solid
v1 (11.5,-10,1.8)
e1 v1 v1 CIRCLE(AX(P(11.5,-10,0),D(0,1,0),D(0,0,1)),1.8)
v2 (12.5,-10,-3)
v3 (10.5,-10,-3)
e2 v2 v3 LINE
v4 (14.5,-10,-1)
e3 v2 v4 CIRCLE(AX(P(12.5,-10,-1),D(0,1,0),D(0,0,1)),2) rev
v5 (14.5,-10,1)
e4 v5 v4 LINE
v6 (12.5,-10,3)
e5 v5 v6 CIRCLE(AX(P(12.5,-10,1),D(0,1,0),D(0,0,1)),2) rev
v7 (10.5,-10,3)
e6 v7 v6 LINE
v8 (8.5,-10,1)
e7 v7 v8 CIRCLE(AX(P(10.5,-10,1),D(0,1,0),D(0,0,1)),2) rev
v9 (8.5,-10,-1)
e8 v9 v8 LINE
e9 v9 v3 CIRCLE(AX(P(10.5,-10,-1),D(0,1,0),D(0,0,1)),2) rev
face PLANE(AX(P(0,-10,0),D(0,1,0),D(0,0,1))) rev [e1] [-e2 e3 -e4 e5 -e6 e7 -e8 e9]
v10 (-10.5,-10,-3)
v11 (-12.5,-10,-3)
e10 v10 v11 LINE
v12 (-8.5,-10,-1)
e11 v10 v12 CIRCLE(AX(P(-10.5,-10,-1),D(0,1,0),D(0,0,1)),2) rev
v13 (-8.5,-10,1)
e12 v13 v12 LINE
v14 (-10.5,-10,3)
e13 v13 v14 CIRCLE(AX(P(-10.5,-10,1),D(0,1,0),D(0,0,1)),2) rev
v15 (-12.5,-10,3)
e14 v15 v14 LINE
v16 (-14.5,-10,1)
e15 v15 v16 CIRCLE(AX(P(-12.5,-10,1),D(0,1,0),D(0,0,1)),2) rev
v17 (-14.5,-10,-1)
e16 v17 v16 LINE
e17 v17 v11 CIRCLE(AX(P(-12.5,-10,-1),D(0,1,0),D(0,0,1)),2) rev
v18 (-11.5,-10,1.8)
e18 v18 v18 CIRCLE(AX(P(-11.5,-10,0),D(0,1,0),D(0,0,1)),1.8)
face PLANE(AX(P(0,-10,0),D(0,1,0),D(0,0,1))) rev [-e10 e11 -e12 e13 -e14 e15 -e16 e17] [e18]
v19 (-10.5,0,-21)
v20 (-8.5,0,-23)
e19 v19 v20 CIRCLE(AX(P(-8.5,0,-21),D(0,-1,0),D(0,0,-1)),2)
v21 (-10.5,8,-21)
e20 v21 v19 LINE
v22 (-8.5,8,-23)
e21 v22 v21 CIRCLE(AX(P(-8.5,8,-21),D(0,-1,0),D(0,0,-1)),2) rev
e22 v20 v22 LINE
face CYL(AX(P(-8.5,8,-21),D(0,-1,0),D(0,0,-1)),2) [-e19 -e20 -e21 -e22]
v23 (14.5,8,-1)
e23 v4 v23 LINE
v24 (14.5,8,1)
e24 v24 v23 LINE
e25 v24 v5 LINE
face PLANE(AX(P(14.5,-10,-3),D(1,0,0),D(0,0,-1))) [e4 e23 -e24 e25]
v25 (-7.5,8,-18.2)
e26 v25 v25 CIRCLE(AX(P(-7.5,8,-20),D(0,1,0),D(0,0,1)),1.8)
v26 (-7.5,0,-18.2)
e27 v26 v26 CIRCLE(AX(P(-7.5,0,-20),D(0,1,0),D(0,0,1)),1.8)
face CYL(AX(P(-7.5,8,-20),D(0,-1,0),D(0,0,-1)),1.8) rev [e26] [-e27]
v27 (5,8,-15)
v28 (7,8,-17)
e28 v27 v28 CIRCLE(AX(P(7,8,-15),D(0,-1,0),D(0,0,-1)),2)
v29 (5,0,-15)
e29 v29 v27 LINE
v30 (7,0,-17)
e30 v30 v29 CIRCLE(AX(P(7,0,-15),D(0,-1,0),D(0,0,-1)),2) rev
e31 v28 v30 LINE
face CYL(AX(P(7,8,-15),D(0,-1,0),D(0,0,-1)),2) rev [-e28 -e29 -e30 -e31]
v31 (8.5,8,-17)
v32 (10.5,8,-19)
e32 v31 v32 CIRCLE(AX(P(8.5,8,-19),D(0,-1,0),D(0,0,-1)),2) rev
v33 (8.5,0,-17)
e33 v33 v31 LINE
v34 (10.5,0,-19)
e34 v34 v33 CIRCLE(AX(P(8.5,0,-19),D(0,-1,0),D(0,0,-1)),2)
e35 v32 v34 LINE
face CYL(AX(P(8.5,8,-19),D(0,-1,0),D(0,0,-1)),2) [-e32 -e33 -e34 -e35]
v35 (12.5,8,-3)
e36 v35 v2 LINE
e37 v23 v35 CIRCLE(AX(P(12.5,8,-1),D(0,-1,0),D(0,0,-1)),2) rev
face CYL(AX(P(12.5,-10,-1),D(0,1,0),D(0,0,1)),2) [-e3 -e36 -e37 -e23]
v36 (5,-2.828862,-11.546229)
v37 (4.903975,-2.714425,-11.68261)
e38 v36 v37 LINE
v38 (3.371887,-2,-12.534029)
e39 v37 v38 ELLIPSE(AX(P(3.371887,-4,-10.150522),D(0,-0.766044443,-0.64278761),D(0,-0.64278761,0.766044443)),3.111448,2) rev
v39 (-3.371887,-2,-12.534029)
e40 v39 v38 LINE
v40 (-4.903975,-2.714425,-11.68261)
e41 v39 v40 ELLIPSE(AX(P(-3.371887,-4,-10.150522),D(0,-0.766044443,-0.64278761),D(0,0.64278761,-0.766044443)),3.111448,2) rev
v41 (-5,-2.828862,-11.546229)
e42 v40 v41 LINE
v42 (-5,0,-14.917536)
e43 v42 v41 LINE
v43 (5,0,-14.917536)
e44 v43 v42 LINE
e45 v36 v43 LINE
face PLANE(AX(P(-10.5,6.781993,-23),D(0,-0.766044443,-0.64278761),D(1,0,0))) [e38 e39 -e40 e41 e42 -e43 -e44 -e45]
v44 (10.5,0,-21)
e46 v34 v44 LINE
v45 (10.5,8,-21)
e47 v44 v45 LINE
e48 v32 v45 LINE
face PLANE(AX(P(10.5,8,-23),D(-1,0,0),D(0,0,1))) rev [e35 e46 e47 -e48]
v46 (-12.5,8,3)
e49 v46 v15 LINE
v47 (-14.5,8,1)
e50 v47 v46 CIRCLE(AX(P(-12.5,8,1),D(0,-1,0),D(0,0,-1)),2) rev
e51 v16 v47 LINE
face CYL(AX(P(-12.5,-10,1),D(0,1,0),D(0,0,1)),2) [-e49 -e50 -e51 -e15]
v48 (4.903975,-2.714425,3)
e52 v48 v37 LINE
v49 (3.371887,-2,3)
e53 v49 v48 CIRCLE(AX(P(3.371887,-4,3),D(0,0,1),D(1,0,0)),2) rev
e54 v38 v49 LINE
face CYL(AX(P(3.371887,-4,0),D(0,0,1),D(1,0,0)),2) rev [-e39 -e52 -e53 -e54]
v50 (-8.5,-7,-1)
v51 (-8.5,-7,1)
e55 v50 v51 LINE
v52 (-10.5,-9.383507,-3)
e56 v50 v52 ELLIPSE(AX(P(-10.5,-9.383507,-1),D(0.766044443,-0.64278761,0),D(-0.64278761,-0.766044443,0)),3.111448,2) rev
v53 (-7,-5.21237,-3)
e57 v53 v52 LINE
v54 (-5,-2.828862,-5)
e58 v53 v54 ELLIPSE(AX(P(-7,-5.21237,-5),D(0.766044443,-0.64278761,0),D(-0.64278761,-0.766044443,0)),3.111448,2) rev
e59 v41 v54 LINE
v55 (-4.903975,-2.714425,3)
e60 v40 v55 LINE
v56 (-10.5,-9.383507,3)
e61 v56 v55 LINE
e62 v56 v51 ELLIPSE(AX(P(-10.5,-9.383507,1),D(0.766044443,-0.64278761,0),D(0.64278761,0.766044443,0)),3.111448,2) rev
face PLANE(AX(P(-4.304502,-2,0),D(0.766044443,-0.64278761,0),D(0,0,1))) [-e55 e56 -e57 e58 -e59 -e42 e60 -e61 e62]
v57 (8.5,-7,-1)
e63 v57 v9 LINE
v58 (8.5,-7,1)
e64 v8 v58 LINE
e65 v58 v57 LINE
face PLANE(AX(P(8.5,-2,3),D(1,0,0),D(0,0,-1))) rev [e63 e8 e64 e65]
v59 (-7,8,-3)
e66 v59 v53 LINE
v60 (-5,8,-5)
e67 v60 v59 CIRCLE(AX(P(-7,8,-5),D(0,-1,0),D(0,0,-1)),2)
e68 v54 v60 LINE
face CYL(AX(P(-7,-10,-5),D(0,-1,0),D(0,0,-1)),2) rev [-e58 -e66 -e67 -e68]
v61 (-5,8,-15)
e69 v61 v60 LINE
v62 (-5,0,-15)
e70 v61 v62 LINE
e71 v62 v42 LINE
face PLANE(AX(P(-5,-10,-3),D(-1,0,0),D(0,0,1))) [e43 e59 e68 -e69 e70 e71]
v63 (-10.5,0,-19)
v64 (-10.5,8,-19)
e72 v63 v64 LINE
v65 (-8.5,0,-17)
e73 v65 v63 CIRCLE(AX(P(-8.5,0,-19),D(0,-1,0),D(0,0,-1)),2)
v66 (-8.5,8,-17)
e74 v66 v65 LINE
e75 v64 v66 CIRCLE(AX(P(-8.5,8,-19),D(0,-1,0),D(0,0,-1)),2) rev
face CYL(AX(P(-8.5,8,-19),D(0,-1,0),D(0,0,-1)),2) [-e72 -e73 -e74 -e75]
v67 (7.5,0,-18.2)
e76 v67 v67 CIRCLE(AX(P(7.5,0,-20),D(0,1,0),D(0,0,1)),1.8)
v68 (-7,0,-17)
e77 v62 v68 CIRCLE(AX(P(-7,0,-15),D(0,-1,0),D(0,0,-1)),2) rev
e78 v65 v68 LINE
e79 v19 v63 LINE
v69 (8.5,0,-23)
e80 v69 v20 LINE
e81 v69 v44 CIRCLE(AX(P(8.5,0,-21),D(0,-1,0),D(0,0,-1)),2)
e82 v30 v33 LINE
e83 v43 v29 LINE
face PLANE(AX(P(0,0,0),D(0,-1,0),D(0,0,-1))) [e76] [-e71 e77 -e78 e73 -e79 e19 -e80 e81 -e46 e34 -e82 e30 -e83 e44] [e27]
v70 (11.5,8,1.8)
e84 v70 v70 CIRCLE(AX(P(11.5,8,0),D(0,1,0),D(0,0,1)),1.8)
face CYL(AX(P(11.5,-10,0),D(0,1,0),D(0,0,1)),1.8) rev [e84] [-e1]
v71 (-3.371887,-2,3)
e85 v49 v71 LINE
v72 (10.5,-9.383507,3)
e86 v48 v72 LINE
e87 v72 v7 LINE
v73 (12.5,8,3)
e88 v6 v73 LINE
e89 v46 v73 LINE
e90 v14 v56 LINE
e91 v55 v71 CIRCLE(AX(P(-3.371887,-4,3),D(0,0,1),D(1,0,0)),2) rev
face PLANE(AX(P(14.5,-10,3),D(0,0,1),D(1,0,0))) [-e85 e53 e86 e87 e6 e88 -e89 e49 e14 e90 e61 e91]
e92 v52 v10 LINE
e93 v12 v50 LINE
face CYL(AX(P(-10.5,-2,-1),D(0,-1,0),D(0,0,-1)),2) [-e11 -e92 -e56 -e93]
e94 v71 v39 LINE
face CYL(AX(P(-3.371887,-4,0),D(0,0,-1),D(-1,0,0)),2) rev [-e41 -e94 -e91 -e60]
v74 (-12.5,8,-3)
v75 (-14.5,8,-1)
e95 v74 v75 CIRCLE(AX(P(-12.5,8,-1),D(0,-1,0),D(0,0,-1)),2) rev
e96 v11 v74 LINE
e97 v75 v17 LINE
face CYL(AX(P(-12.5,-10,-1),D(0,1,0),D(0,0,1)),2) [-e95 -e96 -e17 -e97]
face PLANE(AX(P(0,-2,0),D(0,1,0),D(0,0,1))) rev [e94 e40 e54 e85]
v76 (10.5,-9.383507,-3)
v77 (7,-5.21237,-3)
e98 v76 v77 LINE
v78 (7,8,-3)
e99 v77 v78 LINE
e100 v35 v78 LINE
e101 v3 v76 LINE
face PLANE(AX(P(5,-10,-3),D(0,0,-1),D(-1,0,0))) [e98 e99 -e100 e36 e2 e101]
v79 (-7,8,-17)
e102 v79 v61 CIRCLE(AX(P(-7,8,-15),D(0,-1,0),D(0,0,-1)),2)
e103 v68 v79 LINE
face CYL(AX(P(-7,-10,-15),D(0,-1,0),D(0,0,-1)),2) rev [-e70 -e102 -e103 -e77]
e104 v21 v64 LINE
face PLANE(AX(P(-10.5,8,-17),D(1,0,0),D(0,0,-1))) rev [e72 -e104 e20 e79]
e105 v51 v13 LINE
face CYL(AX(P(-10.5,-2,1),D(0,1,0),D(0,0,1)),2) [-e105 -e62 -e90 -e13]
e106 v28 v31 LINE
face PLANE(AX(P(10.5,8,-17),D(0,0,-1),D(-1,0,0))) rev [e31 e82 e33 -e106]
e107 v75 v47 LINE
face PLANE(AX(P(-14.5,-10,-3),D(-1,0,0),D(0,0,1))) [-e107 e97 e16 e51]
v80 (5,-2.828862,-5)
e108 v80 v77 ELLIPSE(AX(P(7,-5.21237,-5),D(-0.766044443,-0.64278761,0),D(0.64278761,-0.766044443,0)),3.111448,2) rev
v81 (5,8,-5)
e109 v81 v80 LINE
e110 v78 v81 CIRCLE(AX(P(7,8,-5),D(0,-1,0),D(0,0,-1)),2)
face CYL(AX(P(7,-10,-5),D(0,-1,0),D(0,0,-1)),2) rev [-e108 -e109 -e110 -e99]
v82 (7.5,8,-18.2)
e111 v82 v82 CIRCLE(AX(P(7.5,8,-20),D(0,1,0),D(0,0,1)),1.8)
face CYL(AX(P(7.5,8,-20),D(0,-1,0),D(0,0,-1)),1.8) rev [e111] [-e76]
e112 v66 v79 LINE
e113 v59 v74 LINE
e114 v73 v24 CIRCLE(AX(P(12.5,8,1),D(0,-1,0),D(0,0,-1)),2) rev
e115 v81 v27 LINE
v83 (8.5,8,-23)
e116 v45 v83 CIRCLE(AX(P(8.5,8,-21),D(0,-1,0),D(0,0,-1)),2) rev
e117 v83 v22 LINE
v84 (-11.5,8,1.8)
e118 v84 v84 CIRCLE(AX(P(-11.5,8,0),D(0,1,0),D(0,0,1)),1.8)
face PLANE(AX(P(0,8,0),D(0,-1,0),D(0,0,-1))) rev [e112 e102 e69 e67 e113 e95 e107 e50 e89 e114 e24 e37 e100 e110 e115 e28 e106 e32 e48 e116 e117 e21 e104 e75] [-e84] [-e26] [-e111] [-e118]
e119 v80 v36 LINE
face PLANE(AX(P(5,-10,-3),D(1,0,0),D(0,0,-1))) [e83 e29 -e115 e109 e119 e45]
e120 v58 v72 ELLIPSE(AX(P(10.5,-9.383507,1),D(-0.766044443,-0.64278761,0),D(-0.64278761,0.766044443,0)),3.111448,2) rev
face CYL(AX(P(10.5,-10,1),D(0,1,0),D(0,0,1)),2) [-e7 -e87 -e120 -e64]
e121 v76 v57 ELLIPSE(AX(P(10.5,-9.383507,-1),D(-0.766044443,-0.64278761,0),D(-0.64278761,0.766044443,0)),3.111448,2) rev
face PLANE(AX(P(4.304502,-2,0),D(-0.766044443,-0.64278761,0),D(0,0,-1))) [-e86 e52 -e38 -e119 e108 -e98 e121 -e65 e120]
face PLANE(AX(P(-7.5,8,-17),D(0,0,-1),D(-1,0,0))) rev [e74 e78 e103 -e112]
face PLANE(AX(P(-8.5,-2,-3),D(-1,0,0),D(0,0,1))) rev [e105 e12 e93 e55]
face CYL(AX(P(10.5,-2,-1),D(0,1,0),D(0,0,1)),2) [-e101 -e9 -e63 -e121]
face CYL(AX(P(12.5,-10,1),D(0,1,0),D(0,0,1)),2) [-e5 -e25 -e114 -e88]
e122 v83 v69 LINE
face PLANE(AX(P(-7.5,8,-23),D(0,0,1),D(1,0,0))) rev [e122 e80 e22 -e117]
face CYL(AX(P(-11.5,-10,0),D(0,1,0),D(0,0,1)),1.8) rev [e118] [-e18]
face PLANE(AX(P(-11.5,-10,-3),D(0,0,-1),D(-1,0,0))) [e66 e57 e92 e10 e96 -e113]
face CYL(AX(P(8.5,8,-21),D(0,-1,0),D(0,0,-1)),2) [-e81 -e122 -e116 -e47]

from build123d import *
from OCP.BRepFilletAPI import BRepFilletAPI_MakeChamfer

# Parameters (mm, degrees)
SKETCH2_R           = 1.8
BOSS_EXTRUDE1_DEPTH = 10
CHAMFER1_SIZE       = 20
CHAMFER1_SIZE_2     = 16.781992624
BOSS_EXTRUDE3_START = 8
SKETCH4_R           = 1.8
BOSS_EXTRUDE3_DEPTH = 8
CUT_EXTRUDE1_DEPTH  = 8
CHAMFER3_SIZE       = 5
CHAMFER3_SIZE2      = 4.195498156
FILLET1_R           = 2


with BuildPart() as part:
    # Sketch2 → Boss-Extrude1 (new body)
    with BuildSketch(Plane(origin=(0, 0, 0), x_dir=(1, 0, 0), z_dir=(0, 1, 0))):
        Polygon((-11.5, 3), (-5, 3), (-5, 17), (-7.5, 17), (-10.5, 17), (-10.5, 23), (-7.5, 23), (7.5, 23), (10.5, 23), (10.5, 17), (7.5, 17), (5, 17), (5, 3), (11.5, 3), (14.5, 3), (14.5, -3), (11.5, -3), (-11.5, -3), (-14.5, -3), (-14.5, 3), align=None)
        with Locations(Location((-11.5, 0, 0), (0, 0, 270))):
            Circle(SKETCH2_R, mode=Mode.SUBTRACT)
        with Locations(Location((11.5, 0, 0), (0, 0, 270))):
            Circle(SKETCH2_R, mode=Mode.SUBTRACT)
        with Locations(Location((-7.5, 20, 0), (0, 0, 270))):
            Circle(SKETCH2_R, mode=Mode.SUBTRACT)
        with Locations(Location((7.5, 20, 0), (0, 0, 270))):
            Circle(SKETCH2_R, mode=Mode.SUBTRACT)
    extrude(amount=-BOSS_EXTRUDE1_DEPTH)

    # Chamfer1
    # the kernel refuses this chamfer: 20, 16.781992624 mm, written as the material it takes off along each edge
    with BuildSketch(Plane(origin=(62.048122067, -10, -23), x_dir=(0, -0.02493932209023439, 0.9996889667359941), z_dir=(-1, 0, 0))) as chamfer1_piece_1:
        Polygon((CHAMFER1_SIZE * 0.999688966736, CHAMFER1_SIZE * 0.0249393220902), (-CHAMFER1_SIZE_2 * 0.0249393220896, CHAMFER1_SIZE_2 * 0.999688966709), (0, 0), align=None)
    extrude(amount=124.096244134, mode=Mode.SUBTRACT)

    # Sketch4 → Boss-Extrude3 (add)
    with BuildSketch(Plane(origin=(0, 0, 0), x_dir=(1, 0, 0), z_dir=(0, 1, 0)).offset(BOSS_EXTRUDE3_START)):
        Polygon((-7.5, 23), (7.5, 23), (10.5, 23), (10.5, 17), (7.5, 17), (5, 17), (5, 3), (11.5, 3), (14.5, 3), (14.5, -3), (11.5, -3), (-11.5, -3), (-14.5, -3), (-14.5, 3), (-11.5, 3), (-5, 3), (-5, 17), (-7.5, 17), (-10.5, 17), (-10.5, 23), align=None)
        with Locations(Location((-11.5, 0, 0), (0, 0, 270))):
            Circle(SKETCH4_R, mode=Mode.SUBTRACT)
        with Locations(Location((11.5, 0, 0), (0, 0, 270))):
            Circle(SKETCH4_R, mode=Mode.SUBTRACT)
        with Locations(Location((7.5, 20, 0), (0, 0, 270))):
            Circle(SKETCH4_R, mode=Mode.SUBTRACT)
        with Locations(Location((-7.5, 20, 0), (0, 0, 270))):
            Circle(SKETCH4_R, mode=Mode.SUBTRACT)
    extrude(amount=-BOSS_EXTRUDE3_DEPTH)

    # Sketch5 → Cut-Extrude1 (cut)
    with BuildSketch(Plane.XZ.offset(10)):
        Polygon((-8.5, 3), (8.5, 3), (8.5, -3), (8.5, -14.917535926), (5, -14.917535926), (-5, -14.917535926), (-8.5, -14.917535926), (-8.5, -3), align=None)
    extrude(amount=-CUT_EXTRUDE1_DEPTH, mode=Mode.SUBTRACT)

    # Chamfer3: one chamfer whose edges measure the first distance from different faces: ONE call of the kernel's chamfer builder (chamfer() names one face for all edges)
    chamfer3_edges_1 = [part.edges().sort_by_distance(p)[0] for p in [
        (8.5, -2, 0),
    ]]
    chamfer3_side_1 = [part.faces().sort_by_distance(p)[0] for p in [
        (8.5, -6, 0),
    ]]
    chamfer3_edges_2 = [part.edges().sort_by_distance(p)[0] for p in [
        (-8.5, -2, 0),
    ]]
    chamfer3_side_2 = [part.faces().sort_by_distance(p)[0] for p in [
        (-8.5, -6, 0),
    ]]
    chamfer3 = BRepFilletAPI_MakeChamfer(part.part.solid().wrapped)
    for e in chamfer3_edges_1:
        chamfer3.Add(CHAMFER3_SIZE, CHAMFER3_SIZE2, e.wrapped, chamfer3_side_1[0].wrapped)  # the first distance lies on this face
    for e in chamfer3_edges_2:
        chamfer3.Add(CHAMFER3_SIZE, CHAMFER3_SIZE2, e.wrapped, chamfer3_side_2[0].wrapped)  # the first distance lies on this face
    add(Compound.cast(chamfer3.Shape()), mode=Mode.REPLACE)

    # Fillet1
    fillet1_edges = [part.edges().sort_by_distance(p)[0] for p in [
        (-10.5, 4, -23),
        (-10.5, 4, -17),
        (-5, 4, -17),
        (5, 4, -17),
        (10.5, 4, -17),
        (10.5, 4, -23),
        (5, 2.585568787, -3),
        (-5, 2.585568787, -3),
        (-8.5, -8.5, -3),
        (-4.304501844, -2, -4.76701437),
        (4.304501844, -2, -4.76701437),
        (8.5, -8.5, -3),
        (8.5, -8.5, 3),
        (-8.5, -8.5, 3),
        (14.5, -1, -3),
        (14.5, -1, 3),
        (-14.5, -1, 3),
        (-14.5, -1, -3),
    ]]
    fillet(fillet1_edges, radius=FILLET1_R)


solid = part.part
